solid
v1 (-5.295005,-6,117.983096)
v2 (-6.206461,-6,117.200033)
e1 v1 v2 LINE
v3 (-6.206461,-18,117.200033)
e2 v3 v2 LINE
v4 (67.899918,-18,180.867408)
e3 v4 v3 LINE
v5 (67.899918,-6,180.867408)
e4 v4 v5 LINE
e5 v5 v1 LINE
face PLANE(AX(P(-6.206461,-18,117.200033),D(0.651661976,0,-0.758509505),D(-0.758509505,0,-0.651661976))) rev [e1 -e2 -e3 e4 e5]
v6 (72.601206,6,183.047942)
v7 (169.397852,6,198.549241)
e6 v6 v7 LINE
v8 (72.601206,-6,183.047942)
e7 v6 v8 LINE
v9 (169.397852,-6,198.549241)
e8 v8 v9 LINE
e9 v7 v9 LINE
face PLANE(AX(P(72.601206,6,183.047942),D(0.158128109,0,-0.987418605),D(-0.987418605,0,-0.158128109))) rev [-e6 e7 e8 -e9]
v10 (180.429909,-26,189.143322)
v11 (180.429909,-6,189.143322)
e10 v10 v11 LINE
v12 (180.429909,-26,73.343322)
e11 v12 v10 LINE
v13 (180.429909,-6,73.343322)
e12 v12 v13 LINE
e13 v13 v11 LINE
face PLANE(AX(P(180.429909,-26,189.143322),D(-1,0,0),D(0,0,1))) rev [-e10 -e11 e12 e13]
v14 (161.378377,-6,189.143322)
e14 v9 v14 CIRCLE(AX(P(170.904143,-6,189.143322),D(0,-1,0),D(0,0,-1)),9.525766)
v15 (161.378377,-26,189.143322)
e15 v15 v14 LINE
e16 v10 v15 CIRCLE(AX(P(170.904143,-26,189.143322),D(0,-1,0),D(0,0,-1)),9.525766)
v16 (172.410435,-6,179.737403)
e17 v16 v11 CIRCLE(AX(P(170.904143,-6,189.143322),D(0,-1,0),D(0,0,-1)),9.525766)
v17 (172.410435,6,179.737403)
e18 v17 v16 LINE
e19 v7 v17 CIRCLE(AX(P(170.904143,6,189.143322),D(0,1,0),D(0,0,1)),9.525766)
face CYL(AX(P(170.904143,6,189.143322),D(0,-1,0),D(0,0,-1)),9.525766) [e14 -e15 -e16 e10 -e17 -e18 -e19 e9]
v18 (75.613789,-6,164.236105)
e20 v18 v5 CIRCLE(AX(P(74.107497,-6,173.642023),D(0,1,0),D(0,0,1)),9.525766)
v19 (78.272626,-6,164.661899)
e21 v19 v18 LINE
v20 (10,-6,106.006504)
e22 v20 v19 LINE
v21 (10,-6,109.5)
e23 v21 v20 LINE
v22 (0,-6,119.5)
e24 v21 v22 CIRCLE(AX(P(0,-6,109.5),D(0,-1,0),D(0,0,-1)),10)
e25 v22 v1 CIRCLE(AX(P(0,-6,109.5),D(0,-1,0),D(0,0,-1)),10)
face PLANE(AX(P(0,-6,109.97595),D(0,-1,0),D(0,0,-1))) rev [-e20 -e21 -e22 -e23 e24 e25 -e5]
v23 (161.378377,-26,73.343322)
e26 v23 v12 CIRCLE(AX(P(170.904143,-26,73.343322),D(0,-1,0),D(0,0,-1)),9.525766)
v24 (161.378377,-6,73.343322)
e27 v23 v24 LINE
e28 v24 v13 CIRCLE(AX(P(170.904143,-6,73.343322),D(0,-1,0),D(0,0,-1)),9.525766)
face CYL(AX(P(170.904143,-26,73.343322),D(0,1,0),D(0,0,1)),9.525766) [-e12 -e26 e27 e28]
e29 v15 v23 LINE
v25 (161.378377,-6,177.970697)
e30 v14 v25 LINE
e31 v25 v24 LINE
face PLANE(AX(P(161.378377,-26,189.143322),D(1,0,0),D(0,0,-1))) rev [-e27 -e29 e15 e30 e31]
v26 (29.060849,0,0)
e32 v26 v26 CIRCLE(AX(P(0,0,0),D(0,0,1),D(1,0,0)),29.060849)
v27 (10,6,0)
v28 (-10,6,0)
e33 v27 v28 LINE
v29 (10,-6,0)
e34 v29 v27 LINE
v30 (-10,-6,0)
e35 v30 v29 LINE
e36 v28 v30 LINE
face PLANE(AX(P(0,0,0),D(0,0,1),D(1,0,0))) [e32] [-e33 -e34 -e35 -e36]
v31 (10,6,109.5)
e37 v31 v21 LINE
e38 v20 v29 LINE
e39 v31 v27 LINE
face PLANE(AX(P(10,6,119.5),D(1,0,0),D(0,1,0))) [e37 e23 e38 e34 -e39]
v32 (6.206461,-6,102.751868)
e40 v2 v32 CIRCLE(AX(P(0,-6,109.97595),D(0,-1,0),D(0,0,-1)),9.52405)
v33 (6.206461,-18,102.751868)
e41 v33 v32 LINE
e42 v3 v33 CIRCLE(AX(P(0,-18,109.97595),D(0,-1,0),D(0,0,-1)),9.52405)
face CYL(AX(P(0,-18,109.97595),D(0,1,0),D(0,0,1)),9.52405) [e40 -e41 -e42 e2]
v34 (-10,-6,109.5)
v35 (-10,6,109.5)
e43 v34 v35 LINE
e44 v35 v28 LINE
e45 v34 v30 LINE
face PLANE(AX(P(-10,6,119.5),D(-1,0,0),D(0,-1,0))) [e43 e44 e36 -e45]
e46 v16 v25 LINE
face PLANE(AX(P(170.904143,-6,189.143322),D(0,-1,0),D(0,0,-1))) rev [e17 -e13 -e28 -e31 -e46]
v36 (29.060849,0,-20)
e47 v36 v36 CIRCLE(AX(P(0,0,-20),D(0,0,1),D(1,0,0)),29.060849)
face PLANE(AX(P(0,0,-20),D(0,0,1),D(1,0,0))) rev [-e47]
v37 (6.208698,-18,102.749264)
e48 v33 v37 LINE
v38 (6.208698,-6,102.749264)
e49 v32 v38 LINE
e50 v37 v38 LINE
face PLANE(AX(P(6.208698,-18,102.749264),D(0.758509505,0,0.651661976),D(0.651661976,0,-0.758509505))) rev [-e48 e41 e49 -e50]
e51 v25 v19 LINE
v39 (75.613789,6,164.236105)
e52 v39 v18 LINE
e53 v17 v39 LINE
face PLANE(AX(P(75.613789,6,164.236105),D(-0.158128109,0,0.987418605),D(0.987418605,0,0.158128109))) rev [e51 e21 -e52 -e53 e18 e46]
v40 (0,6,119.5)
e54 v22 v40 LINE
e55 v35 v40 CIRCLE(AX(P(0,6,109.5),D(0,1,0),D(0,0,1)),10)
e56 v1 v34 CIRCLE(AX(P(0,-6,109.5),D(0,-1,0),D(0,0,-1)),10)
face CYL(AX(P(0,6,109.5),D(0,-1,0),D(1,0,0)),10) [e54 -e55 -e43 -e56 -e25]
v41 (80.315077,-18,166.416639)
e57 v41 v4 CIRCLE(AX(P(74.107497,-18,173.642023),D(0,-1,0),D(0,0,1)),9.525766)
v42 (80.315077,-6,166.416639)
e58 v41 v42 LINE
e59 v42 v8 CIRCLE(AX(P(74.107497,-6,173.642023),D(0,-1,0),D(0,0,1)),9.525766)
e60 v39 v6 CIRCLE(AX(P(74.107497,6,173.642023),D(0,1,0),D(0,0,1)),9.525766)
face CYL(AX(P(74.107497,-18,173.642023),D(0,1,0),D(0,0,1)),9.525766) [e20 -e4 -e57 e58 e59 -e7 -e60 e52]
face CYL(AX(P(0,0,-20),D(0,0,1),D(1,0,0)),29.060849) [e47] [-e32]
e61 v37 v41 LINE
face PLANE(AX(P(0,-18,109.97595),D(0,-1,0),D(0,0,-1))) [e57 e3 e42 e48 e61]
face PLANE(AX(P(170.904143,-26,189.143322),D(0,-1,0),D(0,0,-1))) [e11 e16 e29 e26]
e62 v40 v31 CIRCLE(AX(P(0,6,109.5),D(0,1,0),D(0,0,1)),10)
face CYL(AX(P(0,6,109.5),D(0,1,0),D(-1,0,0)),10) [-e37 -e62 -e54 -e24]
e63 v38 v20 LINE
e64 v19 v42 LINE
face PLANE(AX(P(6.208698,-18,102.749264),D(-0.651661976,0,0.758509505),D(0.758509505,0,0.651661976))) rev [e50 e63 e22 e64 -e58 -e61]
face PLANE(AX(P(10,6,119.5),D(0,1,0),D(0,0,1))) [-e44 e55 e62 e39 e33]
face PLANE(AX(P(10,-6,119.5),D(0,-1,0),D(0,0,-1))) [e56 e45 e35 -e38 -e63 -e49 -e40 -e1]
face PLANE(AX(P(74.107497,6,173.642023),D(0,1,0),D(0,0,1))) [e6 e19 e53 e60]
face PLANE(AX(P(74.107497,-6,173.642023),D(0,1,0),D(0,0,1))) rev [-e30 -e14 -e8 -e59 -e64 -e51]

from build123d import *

# Parameters (mm, degrees)
SKETCH1_R           = 29.060848553
BOSS_EXTRUDE1_DEPTH = 20
SKETCH2_W           = 20
SKETCH2_H           = 12
BOSS_EXTRUDE2_DEPTH = 139.5
FILLET2_R           = 10
BOSS_EXTRUDE3_DEPTH = 12
BOSS_EXTRUDE4_START = 12
BOSS_EXTRUDE4_DEPTH = 12
BOSS_EXTRUDE6_DEPTH = 20


with BuildPart() as part:
    # Sketch1 → Boss-Extrude1 (new body)
    with BuildSketch(Plane.XY):
        Circle(SKETCH1_R)
    extrude(amount=-BOSS_EXTRUDE1_DEPTH)

    # Sketch2 → Boss-Extrude2 (add)
    with BuildSketch(Plane(origin=(0, 0, -20), x_dir=(-1, 0, 0), z_dir=(0, 0, -1))):
        Rectangle(SKETCH2_W, SKETCH2_H)
    extrude(amount=-BOSS_EXTRUDE2_DEPTH)

    # Fillet2
    # the kernel refuses this fillet: 10 mm, written as the material it takes off along each edge
    with BuildSketch(Plane(origin=(10, -31, 119.5), x_dir=(0, 0, -1), z_dir=(0, 1, 0)), Plane(origin=(-10, 31, 119.5), x_dir=(0, 0, -1), z_dir=(0, -1, 0))) as fillet2_piece_1:
        with BuildLine():
            CenterArc((FILLET2_R, FILLET2_R), FILLET2_R, 180, 90)
            Line((0, FILLET2_R), (0, 0))
            Line((0, 0), (FILLET2_R, 0))
        make_face()
    extrude(amount=62, mode=Mode.SUBTRACT)

    # Sketch3 → Boss-Extrude3 (add)
    with BuildSketch(Plane.XZ.offset(6)):
        with BuildLine():
            Line((6.20869835, 102.749264082), (80.315076986, 166.416639129))
            ThreePointArc((80.315076986, 166.416639129), (81.332881571, 179.849603019), (67.899917681, 180.867407604))
            Line((67.899917681, 180.867407604), (-6.206460955, 117.200032557))
            ThreePointArc((-6.206460955, 117.200032557), (-7.224082117, 103.769489485), (6.206460955, 102.751868323))
            Line((6.206460955, 102.751868323), (6.20869835, 102.749264082))
        make_face()
    extrude(amount=BOSS_EXTRUDE3_DEPTH)

    # Sketch4 → Boss-Extrude4 (add)
    with BuildSketch(Plane(origin=(0, -6, 0), x_dir=(1, 0, 0), z_dir=(0, 1, 0)).offset(BOSS_EXTRUDE4_START)):
        with BuildLine():
            Line((72.601205927, -183.04794218), (169.39785175, -198.549240748))
            ThreePointArc((169.39785175, -198.549240748), (180.31006197, -190.649613341), (172.410434564, -179.737403121))
            Line((172.410434564, -179.737403121), (75.613788741, -164.236104553))
            ThreePointArc((75.613788741, -164.236104553), (64.70157852, -172.13573196), (72.601205927, -183.04794218))
        make_face()
    extrude(amount=-BOSS_EXTRUDE4_DEPTH)

    # Sketch5 → Boss-Extrude6 (add)
    with BuildSketch(Plane.XZ.offset(6)):
        with BuildLine():
            Line((161.378376914, 189.143321934), (161.378376914, 73.343321934))
            ThreePointArc((161.378376914, 73.343321934), (170.904143157, 63.817555691), (180.429909401, 73.343321934))
            Line((180.429909401, 73.343321934), (180.429909401, 189.143321934))
            ThreePointArc((180.429909401, 189.143321934), (170.904143157, 198.669088178), (161.378376914, 189.143321934))
        make_face()
    extrude(amount=BOSS_EXTRUDE6_DEPTH)


solid = part.part
